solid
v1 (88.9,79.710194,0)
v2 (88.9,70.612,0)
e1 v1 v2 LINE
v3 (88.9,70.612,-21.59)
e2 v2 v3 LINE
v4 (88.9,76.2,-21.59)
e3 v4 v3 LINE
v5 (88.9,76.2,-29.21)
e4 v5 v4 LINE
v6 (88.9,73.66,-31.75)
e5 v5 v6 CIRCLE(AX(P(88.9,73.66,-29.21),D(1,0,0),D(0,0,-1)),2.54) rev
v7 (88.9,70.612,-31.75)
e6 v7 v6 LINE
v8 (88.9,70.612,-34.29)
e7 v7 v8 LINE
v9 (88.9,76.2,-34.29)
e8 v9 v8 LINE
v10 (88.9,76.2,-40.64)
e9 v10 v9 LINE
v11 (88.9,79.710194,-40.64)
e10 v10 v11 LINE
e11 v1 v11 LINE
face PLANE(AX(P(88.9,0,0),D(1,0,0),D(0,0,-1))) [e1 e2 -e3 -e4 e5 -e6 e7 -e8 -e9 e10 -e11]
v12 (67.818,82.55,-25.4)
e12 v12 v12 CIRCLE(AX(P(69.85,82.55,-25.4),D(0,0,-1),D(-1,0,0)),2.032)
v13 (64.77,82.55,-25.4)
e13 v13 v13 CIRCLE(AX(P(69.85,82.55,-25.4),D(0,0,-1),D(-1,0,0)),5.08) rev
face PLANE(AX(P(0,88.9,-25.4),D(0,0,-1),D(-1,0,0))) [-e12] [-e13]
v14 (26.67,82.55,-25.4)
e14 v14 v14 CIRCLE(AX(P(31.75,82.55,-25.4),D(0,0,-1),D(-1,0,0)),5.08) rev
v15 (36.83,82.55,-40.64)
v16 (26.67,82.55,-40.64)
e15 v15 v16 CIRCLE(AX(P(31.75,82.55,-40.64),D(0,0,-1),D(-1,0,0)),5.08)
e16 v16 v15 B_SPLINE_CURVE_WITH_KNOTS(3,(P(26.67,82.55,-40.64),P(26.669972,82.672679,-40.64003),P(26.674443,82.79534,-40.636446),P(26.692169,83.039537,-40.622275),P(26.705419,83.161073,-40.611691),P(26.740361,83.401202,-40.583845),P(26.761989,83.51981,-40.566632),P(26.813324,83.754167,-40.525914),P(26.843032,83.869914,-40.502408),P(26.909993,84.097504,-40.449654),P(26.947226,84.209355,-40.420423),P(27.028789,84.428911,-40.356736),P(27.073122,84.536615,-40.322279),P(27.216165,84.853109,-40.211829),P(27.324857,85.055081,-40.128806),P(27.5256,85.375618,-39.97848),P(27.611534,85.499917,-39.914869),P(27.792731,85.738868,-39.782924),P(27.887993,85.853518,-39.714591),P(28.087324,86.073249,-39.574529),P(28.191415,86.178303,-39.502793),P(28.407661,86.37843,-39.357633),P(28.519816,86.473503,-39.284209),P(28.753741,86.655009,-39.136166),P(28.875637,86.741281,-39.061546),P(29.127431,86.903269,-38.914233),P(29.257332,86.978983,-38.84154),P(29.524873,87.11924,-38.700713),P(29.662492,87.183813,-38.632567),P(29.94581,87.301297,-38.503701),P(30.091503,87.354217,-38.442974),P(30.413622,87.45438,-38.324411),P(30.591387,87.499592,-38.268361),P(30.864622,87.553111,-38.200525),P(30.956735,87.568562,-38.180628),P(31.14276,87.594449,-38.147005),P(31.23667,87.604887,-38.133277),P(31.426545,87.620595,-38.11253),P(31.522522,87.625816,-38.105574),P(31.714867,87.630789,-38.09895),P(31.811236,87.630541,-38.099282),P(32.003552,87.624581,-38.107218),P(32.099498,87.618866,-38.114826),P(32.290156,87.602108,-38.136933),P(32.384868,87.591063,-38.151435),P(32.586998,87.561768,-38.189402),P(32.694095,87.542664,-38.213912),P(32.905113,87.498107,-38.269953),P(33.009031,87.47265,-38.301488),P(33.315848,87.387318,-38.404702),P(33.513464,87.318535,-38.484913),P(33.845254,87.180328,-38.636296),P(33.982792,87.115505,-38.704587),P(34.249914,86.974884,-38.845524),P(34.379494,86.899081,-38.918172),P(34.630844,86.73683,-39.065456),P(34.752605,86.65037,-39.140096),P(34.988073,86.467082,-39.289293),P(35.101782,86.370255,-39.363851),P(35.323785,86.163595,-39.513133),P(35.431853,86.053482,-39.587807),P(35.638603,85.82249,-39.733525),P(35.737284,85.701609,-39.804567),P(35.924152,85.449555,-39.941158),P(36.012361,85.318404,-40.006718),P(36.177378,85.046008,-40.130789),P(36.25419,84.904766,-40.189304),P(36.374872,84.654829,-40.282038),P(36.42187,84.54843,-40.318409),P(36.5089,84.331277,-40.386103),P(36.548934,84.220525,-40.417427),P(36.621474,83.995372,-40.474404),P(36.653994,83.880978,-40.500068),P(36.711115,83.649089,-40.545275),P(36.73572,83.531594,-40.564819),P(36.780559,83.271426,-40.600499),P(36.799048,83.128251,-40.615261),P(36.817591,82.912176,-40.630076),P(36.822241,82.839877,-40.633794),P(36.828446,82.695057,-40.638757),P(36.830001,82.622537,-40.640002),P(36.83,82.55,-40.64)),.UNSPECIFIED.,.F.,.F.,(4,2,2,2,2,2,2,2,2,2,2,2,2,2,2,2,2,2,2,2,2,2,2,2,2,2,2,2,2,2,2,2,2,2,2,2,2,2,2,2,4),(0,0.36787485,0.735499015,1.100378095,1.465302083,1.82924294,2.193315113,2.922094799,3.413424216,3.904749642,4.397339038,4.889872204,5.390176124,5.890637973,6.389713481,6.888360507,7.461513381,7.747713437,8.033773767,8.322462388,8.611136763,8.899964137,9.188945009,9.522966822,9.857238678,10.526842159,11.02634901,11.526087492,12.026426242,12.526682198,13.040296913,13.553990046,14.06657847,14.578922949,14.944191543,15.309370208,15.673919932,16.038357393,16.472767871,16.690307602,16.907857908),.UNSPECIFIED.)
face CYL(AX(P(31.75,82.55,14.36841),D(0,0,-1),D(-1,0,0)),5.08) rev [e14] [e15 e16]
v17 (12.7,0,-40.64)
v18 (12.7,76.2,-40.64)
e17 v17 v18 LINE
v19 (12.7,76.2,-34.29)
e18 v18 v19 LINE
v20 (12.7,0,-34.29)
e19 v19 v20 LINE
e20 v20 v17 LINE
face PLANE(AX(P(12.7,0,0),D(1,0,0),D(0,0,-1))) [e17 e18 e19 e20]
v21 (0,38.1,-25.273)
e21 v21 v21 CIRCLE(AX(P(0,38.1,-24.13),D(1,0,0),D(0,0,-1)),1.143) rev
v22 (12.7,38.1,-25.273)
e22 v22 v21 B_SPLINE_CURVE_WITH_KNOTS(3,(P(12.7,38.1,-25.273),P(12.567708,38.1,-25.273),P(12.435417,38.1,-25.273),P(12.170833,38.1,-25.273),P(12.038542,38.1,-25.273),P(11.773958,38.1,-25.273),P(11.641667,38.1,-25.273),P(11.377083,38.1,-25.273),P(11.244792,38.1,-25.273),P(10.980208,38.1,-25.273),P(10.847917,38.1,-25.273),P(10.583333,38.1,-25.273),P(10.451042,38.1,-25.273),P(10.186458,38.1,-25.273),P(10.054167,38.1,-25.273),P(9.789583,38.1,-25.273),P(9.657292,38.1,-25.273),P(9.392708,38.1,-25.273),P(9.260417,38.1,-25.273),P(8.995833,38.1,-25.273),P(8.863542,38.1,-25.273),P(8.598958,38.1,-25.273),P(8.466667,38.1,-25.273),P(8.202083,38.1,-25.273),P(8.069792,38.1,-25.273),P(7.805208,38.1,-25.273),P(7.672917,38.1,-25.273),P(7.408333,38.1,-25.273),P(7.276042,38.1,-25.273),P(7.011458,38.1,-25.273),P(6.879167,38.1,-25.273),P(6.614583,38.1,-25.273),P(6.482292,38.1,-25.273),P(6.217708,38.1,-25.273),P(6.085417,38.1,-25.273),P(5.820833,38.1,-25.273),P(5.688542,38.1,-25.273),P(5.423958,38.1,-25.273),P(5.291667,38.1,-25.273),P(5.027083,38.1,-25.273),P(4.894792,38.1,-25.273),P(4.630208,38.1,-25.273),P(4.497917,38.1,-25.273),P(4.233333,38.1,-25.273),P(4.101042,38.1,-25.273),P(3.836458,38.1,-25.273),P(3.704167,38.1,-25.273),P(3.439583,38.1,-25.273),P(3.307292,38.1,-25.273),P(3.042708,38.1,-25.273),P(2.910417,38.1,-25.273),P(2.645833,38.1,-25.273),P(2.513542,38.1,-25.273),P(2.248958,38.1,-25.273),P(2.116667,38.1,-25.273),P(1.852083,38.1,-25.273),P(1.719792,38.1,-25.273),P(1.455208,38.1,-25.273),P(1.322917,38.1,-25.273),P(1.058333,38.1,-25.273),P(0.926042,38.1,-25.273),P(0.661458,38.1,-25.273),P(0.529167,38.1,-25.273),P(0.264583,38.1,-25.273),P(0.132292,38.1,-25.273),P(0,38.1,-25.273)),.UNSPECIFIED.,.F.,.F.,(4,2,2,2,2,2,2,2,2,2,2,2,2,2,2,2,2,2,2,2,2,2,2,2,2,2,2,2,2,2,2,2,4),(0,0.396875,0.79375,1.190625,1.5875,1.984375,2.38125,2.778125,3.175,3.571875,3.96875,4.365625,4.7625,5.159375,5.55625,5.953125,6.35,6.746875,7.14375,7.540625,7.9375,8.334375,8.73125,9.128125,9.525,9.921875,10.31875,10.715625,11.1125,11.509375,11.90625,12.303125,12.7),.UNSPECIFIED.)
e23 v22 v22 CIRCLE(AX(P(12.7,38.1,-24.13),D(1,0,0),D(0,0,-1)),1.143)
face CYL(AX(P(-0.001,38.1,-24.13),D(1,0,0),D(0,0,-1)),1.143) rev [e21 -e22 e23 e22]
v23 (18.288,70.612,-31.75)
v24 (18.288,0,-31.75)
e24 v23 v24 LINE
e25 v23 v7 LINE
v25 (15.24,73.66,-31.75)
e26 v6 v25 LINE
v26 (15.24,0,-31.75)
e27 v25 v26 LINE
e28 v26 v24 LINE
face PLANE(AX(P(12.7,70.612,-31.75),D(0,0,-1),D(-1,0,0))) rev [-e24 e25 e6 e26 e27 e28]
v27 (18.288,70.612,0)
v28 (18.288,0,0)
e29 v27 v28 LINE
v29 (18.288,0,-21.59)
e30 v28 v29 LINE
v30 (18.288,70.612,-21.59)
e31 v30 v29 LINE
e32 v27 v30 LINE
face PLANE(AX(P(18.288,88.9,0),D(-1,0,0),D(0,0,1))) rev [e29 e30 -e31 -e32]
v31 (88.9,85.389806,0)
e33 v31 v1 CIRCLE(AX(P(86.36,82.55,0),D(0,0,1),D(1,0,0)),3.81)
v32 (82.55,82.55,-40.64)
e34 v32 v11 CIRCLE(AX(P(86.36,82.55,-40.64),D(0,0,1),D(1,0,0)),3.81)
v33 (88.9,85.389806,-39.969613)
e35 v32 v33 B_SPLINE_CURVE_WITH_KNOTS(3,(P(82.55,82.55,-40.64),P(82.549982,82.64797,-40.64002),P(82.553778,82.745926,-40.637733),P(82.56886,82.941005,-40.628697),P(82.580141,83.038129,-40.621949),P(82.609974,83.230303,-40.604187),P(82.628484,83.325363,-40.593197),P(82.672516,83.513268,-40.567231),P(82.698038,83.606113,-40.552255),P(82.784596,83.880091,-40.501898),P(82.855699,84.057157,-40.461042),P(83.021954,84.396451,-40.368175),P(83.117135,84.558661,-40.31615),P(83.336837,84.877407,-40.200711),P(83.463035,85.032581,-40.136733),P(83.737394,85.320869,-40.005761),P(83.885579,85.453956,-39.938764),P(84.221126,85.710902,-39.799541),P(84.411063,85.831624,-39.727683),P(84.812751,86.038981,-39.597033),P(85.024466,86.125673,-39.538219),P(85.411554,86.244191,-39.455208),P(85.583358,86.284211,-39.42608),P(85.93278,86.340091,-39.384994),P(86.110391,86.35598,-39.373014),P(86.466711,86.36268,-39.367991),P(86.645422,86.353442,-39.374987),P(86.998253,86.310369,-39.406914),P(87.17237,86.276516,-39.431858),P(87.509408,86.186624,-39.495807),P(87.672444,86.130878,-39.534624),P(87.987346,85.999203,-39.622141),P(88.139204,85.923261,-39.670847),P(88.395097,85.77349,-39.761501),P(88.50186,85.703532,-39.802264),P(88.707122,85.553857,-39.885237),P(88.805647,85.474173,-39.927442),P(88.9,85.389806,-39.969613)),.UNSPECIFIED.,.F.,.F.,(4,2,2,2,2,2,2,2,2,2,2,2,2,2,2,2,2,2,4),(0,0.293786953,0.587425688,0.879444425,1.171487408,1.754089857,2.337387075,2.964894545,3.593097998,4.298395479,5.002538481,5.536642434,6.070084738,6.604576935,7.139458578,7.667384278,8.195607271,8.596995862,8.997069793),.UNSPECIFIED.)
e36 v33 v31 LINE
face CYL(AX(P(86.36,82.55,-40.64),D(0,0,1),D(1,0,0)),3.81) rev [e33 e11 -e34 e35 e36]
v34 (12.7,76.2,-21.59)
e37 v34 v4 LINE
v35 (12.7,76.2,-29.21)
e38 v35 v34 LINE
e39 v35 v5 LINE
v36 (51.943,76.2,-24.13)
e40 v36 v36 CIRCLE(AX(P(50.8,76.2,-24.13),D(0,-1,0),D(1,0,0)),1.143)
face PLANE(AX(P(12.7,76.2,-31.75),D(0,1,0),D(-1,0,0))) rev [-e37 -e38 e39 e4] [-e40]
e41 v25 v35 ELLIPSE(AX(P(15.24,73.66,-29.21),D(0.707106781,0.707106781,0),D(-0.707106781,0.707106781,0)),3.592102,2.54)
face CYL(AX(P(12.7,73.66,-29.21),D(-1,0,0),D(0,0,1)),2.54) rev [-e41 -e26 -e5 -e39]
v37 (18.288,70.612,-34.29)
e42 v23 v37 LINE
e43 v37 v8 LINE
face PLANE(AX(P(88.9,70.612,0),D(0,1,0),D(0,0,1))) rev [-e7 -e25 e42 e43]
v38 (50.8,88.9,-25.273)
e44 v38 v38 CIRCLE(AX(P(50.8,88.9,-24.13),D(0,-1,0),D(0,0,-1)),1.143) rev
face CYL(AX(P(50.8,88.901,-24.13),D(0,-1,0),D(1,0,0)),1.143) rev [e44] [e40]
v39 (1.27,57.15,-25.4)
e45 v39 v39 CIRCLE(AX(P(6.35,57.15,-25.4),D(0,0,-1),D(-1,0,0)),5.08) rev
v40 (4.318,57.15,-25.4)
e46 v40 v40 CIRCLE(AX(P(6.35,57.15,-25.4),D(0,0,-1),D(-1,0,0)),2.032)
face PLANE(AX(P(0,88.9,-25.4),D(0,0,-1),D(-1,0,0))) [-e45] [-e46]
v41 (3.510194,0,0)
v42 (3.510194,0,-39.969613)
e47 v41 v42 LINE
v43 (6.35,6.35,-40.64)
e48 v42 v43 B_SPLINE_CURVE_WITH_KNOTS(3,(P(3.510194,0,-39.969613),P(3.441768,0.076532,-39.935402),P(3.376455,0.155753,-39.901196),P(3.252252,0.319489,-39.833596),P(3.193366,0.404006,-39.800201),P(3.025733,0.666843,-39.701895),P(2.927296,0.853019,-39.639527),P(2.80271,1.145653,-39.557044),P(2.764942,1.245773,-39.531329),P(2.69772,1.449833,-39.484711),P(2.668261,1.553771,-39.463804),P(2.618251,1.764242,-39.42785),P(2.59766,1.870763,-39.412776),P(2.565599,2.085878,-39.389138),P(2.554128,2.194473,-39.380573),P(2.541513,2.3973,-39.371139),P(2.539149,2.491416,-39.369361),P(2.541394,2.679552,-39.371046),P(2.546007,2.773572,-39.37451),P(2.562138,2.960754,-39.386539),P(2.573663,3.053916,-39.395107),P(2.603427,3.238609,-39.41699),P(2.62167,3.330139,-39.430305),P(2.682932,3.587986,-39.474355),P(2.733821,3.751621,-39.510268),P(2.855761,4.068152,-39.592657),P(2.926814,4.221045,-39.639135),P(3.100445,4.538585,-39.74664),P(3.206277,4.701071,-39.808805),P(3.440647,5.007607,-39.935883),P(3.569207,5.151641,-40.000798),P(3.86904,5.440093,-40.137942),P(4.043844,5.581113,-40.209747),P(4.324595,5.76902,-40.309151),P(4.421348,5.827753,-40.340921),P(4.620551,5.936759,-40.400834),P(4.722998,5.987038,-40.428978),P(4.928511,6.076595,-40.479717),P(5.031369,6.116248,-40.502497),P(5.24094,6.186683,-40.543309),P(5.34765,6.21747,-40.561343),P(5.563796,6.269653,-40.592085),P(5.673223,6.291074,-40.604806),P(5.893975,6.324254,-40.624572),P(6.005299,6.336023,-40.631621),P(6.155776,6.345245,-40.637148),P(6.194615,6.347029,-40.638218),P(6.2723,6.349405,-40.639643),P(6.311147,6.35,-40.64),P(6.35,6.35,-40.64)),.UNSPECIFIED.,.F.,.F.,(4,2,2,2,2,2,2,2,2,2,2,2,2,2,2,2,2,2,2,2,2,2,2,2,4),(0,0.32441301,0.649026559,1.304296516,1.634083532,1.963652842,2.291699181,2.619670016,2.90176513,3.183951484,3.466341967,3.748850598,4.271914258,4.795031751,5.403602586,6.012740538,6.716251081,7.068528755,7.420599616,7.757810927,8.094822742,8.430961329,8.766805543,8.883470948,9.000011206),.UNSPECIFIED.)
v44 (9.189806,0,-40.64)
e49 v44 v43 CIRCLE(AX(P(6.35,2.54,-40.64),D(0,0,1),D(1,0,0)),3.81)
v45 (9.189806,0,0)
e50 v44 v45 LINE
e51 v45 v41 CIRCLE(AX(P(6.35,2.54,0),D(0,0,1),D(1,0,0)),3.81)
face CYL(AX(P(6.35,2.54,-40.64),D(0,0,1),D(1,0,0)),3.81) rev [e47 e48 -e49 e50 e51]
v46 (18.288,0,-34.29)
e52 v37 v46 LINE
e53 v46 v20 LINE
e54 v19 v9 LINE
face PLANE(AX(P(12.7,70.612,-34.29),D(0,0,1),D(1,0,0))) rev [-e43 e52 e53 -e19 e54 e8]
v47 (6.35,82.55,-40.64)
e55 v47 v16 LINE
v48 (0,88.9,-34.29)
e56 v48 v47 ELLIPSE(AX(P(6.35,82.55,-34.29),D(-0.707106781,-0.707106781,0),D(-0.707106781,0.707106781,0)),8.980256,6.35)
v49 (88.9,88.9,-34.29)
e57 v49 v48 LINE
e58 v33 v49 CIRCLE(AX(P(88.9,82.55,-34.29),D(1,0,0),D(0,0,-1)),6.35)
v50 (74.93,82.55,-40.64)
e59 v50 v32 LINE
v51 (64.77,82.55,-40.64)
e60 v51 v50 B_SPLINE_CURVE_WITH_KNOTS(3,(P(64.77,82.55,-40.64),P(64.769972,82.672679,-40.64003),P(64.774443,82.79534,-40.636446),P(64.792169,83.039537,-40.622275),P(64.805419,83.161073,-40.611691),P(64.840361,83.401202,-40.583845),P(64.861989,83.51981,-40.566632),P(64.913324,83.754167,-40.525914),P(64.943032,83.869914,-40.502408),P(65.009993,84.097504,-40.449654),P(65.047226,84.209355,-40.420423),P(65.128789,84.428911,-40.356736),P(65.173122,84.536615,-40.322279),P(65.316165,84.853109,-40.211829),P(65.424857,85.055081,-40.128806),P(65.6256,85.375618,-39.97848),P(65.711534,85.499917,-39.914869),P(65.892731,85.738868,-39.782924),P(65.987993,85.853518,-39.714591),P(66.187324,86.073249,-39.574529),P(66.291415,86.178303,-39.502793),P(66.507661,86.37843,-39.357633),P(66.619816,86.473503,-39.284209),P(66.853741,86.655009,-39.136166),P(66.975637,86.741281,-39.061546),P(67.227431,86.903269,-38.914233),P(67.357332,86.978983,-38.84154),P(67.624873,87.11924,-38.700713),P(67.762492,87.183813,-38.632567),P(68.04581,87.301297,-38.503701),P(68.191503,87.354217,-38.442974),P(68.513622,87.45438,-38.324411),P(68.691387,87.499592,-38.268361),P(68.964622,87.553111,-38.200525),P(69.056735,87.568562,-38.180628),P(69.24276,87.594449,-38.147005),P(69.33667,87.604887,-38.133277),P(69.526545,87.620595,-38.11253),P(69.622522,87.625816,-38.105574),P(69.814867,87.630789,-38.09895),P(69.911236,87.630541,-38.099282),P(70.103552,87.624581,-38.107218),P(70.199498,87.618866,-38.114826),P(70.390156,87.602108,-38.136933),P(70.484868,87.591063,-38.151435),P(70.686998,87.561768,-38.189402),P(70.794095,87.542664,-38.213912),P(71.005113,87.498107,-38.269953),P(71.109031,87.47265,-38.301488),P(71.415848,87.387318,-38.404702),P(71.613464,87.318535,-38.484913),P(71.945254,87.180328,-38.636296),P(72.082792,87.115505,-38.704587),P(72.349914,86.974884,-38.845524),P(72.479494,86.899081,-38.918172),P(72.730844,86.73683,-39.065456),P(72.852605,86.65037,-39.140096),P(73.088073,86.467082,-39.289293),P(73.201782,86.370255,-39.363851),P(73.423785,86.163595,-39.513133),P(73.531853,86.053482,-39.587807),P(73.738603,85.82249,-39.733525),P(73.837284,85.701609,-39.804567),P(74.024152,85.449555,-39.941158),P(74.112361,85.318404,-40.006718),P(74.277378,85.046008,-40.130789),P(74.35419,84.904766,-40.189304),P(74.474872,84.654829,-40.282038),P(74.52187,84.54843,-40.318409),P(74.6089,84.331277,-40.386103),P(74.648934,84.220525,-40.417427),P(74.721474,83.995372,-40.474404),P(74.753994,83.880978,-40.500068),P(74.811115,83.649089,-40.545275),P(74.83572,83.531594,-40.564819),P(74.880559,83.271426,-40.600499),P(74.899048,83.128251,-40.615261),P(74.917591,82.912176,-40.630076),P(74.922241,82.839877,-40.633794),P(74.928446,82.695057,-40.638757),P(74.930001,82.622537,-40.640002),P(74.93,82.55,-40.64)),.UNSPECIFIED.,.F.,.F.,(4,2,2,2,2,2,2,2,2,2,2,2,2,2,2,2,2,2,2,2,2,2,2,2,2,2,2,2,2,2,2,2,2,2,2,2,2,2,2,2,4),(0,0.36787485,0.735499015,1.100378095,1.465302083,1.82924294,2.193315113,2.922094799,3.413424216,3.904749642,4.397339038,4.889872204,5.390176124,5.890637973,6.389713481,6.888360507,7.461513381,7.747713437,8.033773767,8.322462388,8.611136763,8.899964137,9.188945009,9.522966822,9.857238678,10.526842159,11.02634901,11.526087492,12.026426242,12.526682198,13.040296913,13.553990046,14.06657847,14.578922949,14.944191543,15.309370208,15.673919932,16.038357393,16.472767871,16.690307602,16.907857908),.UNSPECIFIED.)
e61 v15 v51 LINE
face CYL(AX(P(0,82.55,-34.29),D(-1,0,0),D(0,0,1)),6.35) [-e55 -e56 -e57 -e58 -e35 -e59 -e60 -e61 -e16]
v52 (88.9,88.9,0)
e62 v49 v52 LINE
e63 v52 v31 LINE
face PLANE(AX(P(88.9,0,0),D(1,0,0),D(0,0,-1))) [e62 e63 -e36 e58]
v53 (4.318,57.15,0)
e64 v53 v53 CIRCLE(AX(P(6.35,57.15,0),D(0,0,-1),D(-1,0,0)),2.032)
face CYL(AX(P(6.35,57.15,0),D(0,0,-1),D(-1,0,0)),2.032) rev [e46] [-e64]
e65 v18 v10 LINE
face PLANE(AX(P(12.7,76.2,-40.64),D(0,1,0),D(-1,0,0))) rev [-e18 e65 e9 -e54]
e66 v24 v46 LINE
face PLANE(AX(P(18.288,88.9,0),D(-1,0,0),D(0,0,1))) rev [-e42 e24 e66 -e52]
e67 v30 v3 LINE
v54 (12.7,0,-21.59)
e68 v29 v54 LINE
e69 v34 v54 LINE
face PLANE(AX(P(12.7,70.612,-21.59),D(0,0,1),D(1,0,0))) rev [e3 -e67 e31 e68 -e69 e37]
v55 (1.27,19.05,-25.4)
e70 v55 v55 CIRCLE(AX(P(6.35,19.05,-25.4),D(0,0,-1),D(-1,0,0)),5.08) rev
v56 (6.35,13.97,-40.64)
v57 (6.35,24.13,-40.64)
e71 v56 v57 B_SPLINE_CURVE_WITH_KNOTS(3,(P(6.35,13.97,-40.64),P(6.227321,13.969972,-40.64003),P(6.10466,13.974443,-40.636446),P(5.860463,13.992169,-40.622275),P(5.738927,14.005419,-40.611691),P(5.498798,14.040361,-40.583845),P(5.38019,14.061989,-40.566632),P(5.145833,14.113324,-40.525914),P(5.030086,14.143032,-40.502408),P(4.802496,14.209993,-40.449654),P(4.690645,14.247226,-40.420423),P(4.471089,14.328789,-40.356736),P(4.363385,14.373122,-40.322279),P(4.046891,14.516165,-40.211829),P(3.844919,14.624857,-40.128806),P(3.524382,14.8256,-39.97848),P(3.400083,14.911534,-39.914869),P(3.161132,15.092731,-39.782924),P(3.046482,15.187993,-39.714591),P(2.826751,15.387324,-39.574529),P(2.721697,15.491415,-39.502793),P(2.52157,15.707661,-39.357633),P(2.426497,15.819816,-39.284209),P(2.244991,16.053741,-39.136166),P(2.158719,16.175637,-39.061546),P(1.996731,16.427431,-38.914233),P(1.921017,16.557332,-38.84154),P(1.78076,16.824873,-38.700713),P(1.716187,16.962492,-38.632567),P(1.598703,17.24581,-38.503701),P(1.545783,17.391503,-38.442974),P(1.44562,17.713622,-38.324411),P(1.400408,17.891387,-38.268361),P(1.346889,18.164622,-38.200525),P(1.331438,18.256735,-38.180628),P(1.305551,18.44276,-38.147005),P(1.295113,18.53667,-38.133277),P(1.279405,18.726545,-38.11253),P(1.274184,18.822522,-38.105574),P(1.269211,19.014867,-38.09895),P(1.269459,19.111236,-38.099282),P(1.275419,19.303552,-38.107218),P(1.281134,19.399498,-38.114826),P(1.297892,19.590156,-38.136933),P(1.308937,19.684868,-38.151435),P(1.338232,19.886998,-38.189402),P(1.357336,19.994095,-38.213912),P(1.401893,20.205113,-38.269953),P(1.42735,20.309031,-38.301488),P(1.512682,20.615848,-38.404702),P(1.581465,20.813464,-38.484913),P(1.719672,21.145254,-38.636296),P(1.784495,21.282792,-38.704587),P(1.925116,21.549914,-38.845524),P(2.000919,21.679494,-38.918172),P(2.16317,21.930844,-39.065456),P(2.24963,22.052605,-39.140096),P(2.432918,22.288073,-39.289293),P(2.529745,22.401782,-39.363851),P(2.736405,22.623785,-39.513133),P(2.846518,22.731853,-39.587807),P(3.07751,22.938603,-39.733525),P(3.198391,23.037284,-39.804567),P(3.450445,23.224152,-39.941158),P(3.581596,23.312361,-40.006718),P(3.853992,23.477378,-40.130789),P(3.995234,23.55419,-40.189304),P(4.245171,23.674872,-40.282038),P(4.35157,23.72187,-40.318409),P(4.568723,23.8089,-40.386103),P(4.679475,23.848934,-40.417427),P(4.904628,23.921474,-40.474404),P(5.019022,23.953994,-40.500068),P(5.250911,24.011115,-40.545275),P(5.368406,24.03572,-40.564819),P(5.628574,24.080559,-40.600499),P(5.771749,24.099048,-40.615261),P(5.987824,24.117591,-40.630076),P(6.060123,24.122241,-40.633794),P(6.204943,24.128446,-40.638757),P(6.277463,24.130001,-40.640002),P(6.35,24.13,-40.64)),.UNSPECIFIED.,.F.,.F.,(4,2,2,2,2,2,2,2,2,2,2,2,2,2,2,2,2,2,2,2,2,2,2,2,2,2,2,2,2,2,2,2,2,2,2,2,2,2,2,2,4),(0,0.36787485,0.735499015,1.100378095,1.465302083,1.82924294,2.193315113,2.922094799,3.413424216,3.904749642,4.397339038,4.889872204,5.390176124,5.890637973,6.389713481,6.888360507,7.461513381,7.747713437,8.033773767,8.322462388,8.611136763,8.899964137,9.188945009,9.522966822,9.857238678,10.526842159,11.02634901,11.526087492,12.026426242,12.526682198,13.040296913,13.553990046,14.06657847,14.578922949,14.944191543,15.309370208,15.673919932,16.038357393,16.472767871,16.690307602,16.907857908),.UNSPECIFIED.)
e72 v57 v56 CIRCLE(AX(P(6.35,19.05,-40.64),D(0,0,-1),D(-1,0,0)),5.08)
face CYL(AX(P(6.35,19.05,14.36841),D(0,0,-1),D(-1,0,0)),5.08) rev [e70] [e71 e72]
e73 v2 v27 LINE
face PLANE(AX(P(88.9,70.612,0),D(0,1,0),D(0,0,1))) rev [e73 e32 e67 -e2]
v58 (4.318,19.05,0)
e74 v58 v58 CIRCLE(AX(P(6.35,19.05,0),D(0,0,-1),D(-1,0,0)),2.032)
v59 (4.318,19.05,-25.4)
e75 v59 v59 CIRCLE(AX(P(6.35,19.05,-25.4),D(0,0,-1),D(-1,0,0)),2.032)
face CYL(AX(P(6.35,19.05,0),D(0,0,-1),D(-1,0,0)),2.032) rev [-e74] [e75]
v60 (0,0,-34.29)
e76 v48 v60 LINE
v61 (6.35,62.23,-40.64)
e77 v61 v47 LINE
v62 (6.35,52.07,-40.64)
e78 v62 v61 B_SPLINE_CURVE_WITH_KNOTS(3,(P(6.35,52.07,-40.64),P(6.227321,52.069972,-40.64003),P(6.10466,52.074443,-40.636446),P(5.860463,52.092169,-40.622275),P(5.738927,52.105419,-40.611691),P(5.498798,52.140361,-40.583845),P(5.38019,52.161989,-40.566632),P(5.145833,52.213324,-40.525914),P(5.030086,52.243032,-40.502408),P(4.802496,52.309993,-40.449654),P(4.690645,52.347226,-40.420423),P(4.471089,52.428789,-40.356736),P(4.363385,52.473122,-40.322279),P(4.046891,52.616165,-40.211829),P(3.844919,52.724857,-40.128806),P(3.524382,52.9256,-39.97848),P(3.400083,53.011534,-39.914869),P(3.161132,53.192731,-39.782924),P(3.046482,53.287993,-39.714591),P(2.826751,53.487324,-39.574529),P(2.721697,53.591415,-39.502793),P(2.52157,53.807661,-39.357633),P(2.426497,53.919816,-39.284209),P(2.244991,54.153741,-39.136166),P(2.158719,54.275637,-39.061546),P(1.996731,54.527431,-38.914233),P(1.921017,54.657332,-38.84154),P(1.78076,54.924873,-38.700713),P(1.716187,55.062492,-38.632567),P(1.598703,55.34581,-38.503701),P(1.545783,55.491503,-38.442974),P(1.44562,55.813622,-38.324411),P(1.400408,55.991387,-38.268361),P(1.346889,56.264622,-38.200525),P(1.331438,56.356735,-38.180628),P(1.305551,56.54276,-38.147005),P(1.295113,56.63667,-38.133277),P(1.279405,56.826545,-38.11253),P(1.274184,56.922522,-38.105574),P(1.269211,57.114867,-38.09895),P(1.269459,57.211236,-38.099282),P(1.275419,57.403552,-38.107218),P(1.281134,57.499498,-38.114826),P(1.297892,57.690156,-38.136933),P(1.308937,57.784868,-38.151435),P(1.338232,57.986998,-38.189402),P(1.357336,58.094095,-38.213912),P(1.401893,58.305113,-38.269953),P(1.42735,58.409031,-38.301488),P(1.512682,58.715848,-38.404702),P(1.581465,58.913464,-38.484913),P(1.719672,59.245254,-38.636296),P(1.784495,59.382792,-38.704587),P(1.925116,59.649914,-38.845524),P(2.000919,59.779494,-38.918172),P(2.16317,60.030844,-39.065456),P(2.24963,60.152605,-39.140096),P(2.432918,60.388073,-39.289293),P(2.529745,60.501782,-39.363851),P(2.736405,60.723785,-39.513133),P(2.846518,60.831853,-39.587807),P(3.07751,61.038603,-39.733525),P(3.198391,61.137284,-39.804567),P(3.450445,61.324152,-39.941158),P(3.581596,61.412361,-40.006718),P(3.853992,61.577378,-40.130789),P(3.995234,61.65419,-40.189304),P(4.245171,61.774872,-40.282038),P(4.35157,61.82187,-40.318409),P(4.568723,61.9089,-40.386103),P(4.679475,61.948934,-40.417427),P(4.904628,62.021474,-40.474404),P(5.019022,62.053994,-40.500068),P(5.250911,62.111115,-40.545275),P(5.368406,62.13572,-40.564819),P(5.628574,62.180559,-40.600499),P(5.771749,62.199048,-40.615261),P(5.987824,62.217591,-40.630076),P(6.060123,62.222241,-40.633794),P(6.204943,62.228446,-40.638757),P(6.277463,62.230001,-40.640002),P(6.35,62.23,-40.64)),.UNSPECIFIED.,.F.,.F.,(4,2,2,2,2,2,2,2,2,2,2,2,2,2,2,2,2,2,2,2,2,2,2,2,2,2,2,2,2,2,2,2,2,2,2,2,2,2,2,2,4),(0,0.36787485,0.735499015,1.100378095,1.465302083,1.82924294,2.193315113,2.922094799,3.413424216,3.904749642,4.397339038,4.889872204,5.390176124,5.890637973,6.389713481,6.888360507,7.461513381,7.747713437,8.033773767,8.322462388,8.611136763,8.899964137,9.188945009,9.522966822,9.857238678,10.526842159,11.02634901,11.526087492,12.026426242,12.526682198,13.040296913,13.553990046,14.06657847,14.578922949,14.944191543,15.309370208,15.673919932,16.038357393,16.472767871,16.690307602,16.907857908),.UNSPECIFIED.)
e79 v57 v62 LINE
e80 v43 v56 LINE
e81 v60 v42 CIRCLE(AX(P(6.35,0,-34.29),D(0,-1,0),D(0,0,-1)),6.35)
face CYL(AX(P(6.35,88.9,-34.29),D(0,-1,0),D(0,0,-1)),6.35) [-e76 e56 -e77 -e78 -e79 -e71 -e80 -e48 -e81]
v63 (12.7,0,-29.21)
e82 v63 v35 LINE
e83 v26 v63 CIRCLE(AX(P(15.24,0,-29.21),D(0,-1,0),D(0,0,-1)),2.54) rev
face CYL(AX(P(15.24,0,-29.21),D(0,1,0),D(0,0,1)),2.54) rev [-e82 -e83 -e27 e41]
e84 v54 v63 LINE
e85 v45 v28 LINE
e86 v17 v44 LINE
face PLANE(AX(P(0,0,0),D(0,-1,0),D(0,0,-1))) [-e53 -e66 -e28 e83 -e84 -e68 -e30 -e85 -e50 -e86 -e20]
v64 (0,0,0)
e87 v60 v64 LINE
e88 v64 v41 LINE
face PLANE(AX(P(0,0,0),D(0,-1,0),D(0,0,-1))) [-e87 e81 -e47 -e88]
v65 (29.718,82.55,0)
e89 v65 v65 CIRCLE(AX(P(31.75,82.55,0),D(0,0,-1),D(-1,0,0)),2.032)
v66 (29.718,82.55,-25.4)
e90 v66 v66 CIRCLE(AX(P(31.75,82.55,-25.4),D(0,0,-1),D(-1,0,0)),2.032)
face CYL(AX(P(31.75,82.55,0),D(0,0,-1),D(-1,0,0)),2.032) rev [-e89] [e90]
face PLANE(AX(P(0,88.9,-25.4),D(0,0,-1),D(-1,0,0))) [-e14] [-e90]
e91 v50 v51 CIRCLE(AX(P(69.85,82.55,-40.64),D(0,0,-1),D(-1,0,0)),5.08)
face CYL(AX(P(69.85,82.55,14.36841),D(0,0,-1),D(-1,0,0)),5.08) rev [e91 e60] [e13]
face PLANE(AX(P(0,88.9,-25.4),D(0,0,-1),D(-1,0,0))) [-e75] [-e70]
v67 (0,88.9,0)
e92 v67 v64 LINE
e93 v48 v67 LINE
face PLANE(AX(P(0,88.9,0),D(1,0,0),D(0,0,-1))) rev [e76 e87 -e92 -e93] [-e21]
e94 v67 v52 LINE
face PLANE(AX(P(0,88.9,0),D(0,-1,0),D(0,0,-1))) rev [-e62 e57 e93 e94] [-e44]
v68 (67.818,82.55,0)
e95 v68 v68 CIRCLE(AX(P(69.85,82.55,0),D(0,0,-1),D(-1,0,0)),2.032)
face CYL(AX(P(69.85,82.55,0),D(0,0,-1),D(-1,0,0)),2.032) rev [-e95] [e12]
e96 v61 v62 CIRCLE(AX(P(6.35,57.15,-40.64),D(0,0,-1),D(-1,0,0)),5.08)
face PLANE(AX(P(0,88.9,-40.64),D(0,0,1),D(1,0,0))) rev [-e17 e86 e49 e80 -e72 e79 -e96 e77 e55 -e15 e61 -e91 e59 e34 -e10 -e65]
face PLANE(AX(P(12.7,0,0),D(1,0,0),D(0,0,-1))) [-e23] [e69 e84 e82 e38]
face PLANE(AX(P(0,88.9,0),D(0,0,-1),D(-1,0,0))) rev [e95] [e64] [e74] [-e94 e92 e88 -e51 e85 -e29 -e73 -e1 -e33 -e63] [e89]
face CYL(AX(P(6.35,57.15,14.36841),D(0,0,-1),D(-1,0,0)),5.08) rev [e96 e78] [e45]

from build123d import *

# Parameters (mm, degrees)
SKETCH2_W           = 18.288
SKETCH2_H           = 40.64
BOSS_EXTRUDE1_DEPTH = 88.9
SKETCH3_W           = 40.64
SKETCH3_H           = 18.288
BOSS_EXTRUDE2_DEPTH = 70.612
SKETCH4_W           = 6.35
SKETCH4_H           = 5.588
SKETCH4_W_2         = 10.16
CUT_EXTRUDE1_DEPTH  = 76.2
SKETCH5_W           = 5.588
SKETCH5_H           = 6.35
SKETCH5_H_2         = 10.16
CUT_EXTRUDE2_DEPTH  = 76.2
SKETCH6_R           = 5.08
CUT_EXTRUDE3_DEPTH  = 15.24
SKETCH7_R           = 2.032
CUT_EXTRUDE4_DEPTH  = 133.128837125
FILLET1_R           = 2.54
FILLET2_R           = 6.35
SKETCH8_R           = 3.81
CUT_EXTRUDE5_DEPTH  = 133.12883729
CUT_EXTRUDE6_REACH  = 125.941
SKETCH9_R           = 1.143
CUT_EXTRUDE7_REACH  = 125.941
SKETCH10_R          = 1.143


with BuildPart() as part:
    # Sketch2 → Boss-Extrude1 (new body)
    with BuildSketch(Plane(origin=(0, 0, 0), x_dir=(1, 0, 0), z_dir=(0, 1, 0))):
        with Locations((9.144, 20.32)):
            Rectangle(SKETCH2_W, SKETCH2_H)
    extrude(amount=BOSS_EXTRUDE1_DEPTH)

    # Sketch3 → Boss-Extrude2 (add)
    with BuildSketch(Plane(origin=(18.288, 0, 0), x_dir=(0, 0, -1), z_dir=(1, 0, 0))):
        with Locations((20.32, 79.756)):
            Rectangle(SKETCH3_W, SKETCH3_H)
    extrude(amount=BOSS_EXTRUDE2_DEPTH)

    # Sketch4 → Cut-Extrude1 (cut)
    with BuildSketch(Plane(origin=(88.9, 0, 0), x_dir=(0, 0, -1), z_dir=(1, 0, 0))):
        with Locations((37.465, 73.406)):
            Rectangle(SKETCH4_W, SKETCH4_H)
        with Locations((26.67, 73.406)):
            Rectangle(SKETCH4_W_2, SKETCH4_H)
    extrude(amount=-CUT_EXTRUDE1_DEPTH, mode=Mode.SUBTRACT)

    # Sketch5 → Cut-Extrude2 (cut)
    with BuildSketch(Plane.XZ):
        with Locations((15.494, -37.465)):
            Rectangle(SKETCH5_W, SKETCH5_H)
        with Locations((15.494, -26.67)):
            Rectangle(SKETCH5_W, SKETCH5_H_2)
    extrude(amount=-CUT_EXTRUDE2_DEPTH, mode=Mode.SUBTRACT)

    # Sketch6 → Cut-Extrude3 (cut)
    with BuildSketch(Plane(origin=(0, 0, -40.64), x_dir=(-1, 0, 0), z_dir=(0, 0, -1))):
        with Locations((-6.35, 19.05)):
            Circle(SKETCH6_R)
        with Locations((-6.35, 57.15)):
            Circle(SKETCH6_R)
        with Locations((-31.75, 82.55)):
            Circle(SKETCH6_R)
        with Locations((-69.85, 82.55)):
            Circle(SKETCH6_R)
    extrude(amount=-CUT_EXTRUDE3_DEPTH, mode=Mode.SUBTRACT)

    # Sketch7 → Cut-Extrude4 (cut, through all)
    with BuildSketch(Plane(origin=(0, 0, -40.64), x_dir=(-1, 0, 0), z_dir=(0, 0, -1))):
        with Locations((-69.85, 82.55)):
            Circle(SKETCH7_R)
        with Locations((-6.35, 57.15)):
            Circle(SKETCH7_R)
        with Locations((-31.75, 82.55)):
            Circle(SKETCH7_R)
        with Locations((-6.35, 19.05)):
            Circle(SKETCH7_R)
    extrude(amount=-CUT_EXTRUDE4_DEPTH, mode=Mode.SUBTRACT)

    # Fillet1
    fillet1_edges = [part.edges().sort_by_distance(p)[0] for p in [
        (12.7, 38.1, -31.75),
        (50.8, 76.2, -31.75),
    ]]
    fillet(fillet1_edges, radius=FILLET1_R)

    # Fillet2
    # the kernel refuses this fillet: 6.35 mm, written as the material it takes off along each edge
    with BuildSketch(Plane(origin=(104.775, 88.9, -40.64), x_dir=(0, -1, 0), z_dir=(-1, 0, 0))) as fillet2_piece_1:
        with BuildLine():
            CenterArc((FILLET2_R, FILLET2_R), FILLET2_R, 180, 90)
            Line((0, FILLET2_R), (0, 0))
            Line((0, 0), (FILLET2_R, 0))
        make_face()
    extrude(amount=120.65, mode=Mode.SUBTRACT)
    with BuildSketch(Plane(origin=(0, -15.875, -40.64), x_dir=(1, 0, 0), z_dir=(0, 1, 0))) as fillet2_piece_2:
        with BuildLine():
            CenterArc((FILLET2_R, -FILLET2_R), FILLET2_R, 90, 90)
            Line((0, -FILLET2_R), (0, 0))
            Line((0, 0), (FILLET2_R, 0))
        make_face()
    extrude(amount=120.65, mode=Mode.SUBTRACT)

    # Sketch8 → Cut-Extrude5 (cut, through all)
    with BuildSketch(Plane.XY):
        with Locations((6.35, 2.54)):
            Circle(SKETCH8_R)
        with Locations((86.36, 82.55)):
            Circle(SKETCH8_R)
    extrude(amount=-CUT_EXTRUDE5_DEPTH, mode=Mode.SUBTRACT)

    # Sketch9 → Cut-Extrude6 (cut, up to next)
    with BuildSketch(Plane.XZ.offset(-76.2), mode=Mode.PRIVATE) as cut_extrude6_sk1:
        with Locations((50.8, -24.13)):
            Circle(SKETCH9_R)
    cut_extrude6_tool1 = extrude(cut_extrude6_sk1.sketch, amount=-CUT_EXTRUDE6_REACH, mode=Mode.PRIVATE) & part.part
    add(cut_extrude6_tool1.solids().sort_by_distance((50.8, 76.2, -24.13))[0], mode=Mode.SUBTRACT)

    # Sketch10 → Cut-Extrude7 (cut, up to next)
    with BuildSketch(Plane(origin=(12.7, 0, 0), x_dir=(0, 0, -1), z_dir=(1, 0, 0)), mode=Mode.PRIVATE) as cut_extrude7_sk1:
        with Locations((24.13, 38.1)):
            Circle(SKETCH10_R)
    cut_extrude7_tool1 = extrude(cut_extrude7_sk1.sketch, amount=-CUT_EXTRUDE7_REACH, mode=Mode.PRIVATE) & part.part
    add(cut_extrude7_tool1.solids().sort_by_distance((12.7, 38.1, -24.13))[0], mode=Mode.SUBTRACT)


solid = part.part
